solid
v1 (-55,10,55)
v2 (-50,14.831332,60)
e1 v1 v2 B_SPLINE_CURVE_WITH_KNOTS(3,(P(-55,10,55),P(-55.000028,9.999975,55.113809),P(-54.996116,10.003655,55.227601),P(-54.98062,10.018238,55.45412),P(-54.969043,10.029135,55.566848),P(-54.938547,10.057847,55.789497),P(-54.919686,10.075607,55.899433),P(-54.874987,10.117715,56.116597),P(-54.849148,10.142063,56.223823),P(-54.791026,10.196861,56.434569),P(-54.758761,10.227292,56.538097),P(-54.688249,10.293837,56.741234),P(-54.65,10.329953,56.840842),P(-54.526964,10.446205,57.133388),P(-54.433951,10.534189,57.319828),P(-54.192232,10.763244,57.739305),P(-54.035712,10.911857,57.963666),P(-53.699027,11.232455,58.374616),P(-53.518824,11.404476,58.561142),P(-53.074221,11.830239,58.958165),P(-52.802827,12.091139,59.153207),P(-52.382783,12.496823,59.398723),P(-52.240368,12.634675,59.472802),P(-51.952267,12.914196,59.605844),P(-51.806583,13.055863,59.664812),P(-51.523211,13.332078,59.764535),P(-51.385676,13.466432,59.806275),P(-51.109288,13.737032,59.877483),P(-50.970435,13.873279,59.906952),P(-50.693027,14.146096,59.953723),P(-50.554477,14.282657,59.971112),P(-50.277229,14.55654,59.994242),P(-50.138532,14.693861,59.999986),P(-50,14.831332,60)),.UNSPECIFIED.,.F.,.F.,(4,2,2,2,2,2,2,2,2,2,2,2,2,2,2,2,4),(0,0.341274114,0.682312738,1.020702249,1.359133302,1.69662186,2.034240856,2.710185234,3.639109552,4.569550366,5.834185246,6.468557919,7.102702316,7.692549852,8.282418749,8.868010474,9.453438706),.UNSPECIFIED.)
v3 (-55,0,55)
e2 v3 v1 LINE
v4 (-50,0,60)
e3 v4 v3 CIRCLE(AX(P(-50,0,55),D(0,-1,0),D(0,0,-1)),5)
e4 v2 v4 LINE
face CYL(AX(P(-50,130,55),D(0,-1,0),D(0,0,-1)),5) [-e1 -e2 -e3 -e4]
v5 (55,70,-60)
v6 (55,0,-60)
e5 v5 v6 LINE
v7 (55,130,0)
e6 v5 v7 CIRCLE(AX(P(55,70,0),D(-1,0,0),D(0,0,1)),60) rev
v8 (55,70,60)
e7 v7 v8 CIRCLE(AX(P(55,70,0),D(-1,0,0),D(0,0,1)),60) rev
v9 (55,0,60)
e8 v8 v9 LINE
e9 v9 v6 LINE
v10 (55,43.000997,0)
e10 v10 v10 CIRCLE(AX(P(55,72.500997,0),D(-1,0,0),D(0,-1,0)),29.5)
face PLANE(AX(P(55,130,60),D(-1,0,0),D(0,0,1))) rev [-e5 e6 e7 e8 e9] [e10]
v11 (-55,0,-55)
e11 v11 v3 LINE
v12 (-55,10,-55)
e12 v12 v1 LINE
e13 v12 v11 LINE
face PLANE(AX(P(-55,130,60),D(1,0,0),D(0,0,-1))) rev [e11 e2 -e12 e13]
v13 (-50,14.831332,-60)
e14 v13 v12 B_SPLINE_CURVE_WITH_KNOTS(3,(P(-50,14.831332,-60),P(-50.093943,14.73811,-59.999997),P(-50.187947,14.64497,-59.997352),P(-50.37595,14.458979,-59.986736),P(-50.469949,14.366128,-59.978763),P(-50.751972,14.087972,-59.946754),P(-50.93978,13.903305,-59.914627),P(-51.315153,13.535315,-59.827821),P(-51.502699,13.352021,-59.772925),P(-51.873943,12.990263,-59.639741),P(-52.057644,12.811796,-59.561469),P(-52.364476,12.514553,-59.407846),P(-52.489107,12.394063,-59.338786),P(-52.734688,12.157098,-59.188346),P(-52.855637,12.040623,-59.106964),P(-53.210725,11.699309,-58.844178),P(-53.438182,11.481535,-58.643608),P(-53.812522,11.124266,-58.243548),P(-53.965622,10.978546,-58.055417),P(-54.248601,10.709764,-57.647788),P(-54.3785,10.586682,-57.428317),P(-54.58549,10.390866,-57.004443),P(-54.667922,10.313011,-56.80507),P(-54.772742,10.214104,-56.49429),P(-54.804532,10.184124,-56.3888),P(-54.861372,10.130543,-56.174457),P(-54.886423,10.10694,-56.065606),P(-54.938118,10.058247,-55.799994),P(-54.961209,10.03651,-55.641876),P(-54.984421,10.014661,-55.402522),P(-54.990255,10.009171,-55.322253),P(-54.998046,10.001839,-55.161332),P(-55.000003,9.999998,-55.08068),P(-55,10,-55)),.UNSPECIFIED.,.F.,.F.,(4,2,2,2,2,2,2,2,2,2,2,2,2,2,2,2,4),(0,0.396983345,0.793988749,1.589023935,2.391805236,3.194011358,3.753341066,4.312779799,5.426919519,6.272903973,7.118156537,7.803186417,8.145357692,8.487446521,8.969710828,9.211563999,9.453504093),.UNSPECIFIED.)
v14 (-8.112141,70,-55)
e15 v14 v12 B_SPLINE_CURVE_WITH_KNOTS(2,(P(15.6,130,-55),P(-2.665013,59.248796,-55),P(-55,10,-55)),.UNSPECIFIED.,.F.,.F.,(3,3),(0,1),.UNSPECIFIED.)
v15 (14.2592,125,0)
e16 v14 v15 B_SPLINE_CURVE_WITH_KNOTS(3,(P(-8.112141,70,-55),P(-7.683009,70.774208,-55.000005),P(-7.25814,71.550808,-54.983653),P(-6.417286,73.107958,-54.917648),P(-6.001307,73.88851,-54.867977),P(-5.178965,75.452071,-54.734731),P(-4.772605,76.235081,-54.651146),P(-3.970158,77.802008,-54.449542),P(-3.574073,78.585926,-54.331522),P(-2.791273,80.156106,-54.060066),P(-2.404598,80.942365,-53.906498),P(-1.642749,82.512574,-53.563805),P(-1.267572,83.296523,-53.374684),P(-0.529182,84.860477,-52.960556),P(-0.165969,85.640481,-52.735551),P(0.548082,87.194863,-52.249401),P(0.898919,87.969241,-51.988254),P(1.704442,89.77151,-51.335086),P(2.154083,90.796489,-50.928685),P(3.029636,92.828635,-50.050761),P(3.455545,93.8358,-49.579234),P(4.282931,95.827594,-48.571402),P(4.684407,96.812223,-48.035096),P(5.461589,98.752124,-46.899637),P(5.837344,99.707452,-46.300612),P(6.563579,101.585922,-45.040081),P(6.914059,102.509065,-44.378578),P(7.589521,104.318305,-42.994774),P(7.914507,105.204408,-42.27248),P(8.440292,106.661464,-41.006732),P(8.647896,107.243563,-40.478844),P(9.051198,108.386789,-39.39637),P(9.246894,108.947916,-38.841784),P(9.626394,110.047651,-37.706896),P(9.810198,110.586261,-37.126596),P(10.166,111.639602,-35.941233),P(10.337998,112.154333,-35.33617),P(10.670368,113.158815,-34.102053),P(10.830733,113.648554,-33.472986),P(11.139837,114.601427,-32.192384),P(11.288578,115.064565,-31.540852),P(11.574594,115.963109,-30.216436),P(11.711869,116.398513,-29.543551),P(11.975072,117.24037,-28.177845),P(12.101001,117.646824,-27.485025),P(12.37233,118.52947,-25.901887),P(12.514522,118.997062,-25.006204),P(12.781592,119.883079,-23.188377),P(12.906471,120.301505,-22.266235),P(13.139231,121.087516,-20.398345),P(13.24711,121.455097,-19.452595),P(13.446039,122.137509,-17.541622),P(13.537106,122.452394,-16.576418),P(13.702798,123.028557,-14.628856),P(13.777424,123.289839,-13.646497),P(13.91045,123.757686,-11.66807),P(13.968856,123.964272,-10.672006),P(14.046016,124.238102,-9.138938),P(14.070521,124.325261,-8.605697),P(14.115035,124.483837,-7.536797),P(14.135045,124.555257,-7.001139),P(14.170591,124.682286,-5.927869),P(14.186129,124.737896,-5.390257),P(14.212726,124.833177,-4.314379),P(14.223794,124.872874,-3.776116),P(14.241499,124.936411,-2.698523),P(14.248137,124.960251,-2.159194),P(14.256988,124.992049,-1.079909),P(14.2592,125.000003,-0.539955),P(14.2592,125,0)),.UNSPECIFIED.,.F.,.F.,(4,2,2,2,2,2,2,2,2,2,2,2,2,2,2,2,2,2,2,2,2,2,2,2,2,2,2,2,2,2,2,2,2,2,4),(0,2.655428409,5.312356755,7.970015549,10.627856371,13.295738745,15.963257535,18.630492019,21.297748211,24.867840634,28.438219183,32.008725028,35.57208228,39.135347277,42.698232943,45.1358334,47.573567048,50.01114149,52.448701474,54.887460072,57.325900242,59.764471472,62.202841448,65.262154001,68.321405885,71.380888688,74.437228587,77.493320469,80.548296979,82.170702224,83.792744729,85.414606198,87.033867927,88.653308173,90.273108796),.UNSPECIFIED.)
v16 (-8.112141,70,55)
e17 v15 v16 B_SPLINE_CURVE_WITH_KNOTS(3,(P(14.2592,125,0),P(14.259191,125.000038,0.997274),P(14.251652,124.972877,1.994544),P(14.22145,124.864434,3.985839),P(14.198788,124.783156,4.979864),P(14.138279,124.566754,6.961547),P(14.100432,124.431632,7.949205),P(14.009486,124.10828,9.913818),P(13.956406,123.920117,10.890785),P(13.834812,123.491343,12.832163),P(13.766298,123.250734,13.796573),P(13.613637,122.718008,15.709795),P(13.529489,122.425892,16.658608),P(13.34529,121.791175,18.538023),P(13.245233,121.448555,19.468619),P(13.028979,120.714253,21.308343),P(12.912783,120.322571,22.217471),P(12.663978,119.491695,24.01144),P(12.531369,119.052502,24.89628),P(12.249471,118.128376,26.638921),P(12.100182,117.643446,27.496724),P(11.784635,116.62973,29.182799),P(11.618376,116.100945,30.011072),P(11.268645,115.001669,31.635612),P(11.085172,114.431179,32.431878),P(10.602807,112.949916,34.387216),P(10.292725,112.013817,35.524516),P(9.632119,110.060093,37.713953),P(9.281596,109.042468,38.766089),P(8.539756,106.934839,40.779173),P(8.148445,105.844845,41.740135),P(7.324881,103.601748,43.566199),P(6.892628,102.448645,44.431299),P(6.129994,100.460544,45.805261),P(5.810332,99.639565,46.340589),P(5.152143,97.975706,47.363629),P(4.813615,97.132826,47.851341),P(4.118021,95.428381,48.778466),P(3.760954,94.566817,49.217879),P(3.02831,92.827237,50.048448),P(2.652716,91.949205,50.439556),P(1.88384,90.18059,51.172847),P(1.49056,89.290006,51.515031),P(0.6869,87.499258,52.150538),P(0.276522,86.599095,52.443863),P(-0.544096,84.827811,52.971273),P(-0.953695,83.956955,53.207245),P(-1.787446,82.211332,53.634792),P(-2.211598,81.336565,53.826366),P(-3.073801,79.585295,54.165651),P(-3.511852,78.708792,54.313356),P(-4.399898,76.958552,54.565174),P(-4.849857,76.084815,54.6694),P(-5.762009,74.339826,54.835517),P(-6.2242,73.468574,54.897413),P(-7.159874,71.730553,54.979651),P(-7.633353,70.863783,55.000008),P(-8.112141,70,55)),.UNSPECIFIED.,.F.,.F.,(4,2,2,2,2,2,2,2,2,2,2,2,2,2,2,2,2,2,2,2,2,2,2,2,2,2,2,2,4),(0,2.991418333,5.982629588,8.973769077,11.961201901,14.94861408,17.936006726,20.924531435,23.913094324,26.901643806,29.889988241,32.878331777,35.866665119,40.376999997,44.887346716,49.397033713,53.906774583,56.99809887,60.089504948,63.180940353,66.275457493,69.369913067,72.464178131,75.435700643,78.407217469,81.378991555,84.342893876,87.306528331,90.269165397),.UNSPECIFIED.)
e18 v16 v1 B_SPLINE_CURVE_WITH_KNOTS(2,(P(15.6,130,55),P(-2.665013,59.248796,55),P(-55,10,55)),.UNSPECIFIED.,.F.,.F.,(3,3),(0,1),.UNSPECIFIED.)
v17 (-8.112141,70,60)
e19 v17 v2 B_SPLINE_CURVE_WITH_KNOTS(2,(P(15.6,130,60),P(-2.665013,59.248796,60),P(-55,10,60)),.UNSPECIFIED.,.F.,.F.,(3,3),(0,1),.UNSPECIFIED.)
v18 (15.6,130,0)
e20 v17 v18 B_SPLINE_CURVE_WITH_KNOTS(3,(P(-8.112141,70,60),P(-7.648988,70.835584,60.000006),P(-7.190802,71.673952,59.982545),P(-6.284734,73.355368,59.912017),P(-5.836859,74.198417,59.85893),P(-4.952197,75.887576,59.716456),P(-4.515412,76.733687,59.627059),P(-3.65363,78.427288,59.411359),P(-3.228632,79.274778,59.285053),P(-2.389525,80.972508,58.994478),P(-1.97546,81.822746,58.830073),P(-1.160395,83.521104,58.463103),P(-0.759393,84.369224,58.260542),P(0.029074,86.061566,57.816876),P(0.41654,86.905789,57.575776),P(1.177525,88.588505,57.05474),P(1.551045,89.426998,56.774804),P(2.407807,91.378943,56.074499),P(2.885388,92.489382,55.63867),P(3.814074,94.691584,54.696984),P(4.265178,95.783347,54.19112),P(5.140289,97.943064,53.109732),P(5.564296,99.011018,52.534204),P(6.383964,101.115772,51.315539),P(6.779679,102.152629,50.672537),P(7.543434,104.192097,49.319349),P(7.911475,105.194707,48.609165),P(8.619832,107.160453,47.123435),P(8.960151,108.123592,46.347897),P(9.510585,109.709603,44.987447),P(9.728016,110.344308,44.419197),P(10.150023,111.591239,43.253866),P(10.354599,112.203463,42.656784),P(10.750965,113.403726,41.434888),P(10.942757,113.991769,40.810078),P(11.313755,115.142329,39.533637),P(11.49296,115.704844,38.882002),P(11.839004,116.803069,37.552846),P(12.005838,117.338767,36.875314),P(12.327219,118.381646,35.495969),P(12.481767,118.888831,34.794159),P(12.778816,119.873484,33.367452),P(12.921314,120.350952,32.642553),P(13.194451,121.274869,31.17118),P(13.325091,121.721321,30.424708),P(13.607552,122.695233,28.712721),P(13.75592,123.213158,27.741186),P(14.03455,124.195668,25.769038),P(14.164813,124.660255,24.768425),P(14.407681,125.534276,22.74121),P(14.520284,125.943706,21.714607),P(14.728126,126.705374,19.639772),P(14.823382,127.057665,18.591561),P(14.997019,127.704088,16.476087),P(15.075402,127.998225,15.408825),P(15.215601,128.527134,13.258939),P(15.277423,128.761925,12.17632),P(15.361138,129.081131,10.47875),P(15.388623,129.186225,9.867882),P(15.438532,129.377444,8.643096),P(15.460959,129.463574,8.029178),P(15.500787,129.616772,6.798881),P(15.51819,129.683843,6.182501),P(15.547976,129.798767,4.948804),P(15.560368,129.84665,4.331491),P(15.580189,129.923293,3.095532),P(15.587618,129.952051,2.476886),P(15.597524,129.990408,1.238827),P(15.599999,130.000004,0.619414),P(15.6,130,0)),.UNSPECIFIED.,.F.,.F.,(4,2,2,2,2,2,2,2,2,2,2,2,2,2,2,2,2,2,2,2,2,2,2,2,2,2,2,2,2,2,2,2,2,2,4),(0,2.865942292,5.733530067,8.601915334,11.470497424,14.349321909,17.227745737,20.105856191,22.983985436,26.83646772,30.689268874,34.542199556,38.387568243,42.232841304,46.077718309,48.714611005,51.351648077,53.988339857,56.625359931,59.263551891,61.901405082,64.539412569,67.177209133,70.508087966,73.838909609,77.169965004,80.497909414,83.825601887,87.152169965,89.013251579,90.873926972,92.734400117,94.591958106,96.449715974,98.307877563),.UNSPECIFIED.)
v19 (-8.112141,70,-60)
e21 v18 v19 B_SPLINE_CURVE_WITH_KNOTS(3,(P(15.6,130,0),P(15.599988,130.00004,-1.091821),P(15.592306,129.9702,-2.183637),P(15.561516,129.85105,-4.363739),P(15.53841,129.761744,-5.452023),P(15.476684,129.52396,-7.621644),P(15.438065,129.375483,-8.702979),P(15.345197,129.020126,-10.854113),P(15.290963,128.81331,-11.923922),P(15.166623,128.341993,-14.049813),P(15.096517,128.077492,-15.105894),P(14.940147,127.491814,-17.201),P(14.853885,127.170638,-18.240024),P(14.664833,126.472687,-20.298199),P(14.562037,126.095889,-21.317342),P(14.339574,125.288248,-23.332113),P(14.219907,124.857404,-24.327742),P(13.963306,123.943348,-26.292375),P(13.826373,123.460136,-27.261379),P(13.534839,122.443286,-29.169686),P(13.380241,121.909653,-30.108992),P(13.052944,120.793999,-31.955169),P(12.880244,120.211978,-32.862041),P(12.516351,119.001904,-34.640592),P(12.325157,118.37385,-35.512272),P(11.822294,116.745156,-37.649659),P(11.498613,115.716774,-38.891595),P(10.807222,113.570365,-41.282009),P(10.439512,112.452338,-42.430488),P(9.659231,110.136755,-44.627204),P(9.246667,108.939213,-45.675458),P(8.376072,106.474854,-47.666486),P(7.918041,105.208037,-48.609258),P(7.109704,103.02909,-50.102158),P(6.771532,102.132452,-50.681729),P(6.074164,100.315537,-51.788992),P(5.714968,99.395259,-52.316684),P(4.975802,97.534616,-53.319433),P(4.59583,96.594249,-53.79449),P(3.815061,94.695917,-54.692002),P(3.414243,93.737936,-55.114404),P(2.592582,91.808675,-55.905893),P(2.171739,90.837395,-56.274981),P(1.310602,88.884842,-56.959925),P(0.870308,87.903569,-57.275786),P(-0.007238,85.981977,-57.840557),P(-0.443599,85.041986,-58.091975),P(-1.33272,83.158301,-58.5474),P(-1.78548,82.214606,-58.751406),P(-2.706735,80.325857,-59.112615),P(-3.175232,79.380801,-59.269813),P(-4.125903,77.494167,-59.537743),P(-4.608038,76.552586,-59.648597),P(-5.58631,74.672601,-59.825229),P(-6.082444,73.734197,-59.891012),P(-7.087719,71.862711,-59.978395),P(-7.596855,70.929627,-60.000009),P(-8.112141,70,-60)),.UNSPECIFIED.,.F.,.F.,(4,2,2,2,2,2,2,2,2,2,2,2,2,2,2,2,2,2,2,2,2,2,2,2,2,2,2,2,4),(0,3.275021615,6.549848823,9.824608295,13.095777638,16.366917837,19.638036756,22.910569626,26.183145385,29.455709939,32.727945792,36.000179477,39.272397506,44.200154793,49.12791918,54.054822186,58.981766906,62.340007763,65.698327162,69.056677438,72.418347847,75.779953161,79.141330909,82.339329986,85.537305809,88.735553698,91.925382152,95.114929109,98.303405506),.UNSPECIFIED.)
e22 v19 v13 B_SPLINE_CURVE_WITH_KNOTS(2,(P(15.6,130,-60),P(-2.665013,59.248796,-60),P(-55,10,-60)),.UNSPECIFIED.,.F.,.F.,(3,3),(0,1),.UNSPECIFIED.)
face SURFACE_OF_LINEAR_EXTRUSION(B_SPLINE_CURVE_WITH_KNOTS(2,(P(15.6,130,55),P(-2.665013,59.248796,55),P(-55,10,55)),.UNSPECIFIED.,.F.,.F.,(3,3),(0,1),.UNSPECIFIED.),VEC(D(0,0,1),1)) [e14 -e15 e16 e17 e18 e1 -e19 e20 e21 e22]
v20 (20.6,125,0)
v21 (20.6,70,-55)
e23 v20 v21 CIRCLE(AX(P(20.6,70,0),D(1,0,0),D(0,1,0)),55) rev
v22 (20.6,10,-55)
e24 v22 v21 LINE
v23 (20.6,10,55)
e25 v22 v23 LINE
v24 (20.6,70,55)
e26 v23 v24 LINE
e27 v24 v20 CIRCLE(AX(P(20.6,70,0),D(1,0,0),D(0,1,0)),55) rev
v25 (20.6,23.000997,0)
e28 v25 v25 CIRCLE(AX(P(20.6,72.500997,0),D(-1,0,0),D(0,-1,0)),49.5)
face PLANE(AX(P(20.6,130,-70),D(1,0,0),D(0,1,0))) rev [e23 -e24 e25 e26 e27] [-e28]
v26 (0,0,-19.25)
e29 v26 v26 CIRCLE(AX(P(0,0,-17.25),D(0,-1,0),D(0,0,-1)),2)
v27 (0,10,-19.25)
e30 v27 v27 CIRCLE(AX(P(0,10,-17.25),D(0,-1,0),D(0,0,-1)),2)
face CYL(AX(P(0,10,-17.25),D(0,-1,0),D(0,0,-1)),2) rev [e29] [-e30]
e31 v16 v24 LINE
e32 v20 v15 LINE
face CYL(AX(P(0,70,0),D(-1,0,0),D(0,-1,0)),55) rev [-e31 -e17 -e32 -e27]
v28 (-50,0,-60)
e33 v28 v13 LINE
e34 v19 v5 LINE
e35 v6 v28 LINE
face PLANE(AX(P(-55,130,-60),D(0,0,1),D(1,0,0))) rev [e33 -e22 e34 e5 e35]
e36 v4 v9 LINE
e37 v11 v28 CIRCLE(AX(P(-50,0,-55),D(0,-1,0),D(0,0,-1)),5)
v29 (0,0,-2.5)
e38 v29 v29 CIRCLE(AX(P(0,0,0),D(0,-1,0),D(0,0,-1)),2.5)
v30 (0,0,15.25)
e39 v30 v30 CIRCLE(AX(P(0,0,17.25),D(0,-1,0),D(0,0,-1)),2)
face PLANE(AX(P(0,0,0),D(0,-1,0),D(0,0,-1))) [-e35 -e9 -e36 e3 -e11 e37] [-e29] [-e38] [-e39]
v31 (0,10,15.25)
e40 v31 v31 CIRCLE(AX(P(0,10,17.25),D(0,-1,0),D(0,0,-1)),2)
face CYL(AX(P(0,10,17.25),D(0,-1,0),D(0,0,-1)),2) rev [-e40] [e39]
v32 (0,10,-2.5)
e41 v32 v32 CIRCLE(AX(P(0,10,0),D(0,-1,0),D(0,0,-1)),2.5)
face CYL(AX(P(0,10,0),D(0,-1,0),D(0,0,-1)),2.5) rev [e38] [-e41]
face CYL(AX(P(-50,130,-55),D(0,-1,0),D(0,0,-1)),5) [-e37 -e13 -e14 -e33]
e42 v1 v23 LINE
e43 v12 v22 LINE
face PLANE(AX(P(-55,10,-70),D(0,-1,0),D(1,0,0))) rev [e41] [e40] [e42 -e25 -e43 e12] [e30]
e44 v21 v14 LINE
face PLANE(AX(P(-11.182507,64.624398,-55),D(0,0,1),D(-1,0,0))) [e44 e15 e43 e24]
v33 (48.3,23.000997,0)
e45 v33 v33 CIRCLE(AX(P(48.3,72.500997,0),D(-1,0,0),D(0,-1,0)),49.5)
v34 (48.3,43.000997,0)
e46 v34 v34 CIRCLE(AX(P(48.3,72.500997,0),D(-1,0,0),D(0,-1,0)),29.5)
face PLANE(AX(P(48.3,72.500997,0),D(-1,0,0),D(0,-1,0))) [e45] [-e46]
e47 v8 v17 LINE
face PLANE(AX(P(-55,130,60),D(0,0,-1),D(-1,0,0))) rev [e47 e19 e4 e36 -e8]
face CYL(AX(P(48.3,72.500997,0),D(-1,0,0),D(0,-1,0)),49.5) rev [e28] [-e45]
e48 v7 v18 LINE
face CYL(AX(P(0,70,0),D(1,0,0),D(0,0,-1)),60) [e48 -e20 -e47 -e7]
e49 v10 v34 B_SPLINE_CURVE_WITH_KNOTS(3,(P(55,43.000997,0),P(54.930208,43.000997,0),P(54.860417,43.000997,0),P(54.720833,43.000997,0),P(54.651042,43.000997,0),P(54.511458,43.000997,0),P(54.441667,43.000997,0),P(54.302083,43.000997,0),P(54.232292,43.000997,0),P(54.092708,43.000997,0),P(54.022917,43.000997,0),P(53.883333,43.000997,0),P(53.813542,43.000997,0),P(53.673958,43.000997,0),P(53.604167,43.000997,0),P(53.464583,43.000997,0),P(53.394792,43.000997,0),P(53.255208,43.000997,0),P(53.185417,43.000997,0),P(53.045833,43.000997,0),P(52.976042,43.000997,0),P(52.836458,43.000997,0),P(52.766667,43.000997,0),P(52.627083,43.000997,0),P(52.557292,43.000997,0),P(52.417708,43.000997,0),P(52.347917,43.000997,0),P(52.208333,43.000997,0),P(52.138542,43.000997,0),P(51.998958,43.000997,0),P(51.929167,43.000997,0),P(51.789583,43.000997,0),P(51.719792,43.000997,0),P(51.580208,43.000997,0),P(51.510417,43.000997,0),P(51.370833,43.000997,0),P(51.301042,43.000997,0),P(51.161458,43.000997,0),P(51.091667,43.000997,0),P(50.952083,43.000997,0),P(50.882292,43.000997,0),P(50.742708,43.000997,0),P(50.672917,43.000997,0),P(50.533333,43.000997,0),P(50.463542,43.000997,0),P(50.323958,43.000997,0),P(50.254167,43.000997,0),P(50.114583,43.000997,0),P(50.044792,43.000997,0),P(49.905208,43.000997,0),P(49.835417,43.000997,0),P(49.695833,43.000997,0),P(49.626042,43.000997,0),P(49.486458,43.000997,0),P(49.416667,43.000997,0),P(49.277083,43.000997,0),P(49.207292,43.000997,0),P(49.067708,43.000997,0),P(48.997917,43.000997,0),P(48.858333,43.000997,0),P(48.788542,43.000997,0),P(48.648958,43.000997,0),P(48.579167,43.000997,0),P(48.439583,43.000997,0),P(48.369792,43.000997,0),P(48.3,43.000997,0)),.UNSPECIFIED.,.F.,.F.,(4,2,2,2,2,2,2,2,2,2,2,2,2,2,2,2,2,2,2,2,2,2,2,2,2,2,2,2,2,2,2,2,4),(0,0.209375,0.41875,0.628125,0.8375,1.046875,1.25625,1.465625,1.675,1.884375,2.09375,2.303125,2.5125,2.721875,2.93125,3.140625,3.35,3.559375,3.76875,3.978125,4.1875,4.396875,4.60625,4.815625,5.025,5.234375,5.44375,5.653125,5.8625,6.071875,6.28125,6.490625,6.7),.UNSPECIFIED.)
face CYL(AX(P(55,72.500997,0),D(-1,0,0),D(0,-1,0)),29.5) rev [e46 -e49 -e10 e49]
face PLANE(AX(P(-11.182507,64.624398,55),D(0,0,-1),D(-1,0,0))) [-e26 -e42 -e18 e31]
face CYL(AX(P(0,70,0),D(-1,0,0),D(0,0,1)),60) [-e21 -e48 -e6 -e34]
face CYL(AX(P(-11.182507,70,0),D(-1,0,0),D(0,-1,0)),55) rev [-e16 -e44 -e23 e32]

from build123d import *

# Parameters (mm, degrees)
SKETCH_1_W          = 110
SKETCH_1_H          = 120
EXTRUDE_1_DEPTH     = 130
SKETCH_3_W          = 75.6
SKETCH_3_H          = 120
CUT_EXTRUDE_1_DEPTH = 130
EXTRUDE_2_DEPTH     = 5
EXTRUDE_3_DEPTH     = 110
FILLET_START        = -8.112141349
FILLET_2_DEPTH      = 28.712141349
FILLET_START_2      = -55
FILLET_2_2_DEPTH    = 110
FILLET_3_R          = 60
FILLET_4_R          = 5
SKETCH_6_R          = 49.5
CUT_EXTRUDE_2_DEPTH = 27.7
SKETCH_7_R          = 29.5
CUT_EXTRUDE_5_DEPTH = 177.552797006
SKETCH_8_R          = 2.5
SKETCH_8_R_2        = 2
CUT_EXTRUDE_6_DEPTH = 10


with BuildPart() as part:
    # 草图1 → 凸台-拉伸1 (new body)
    with BuildSketch(Plane(origin=(0, 0, 0), x_dir=(1, 0, 0), z_dir=(0, 1, 0))):
        Rectangle(SKETCH_1_W, SKETCH_1_H)
    extrude(amount=EXTRUDE_1_DEPTH)

    # 草图3 → 切除-拉伸1 (cut)
    with BuildSketch(Plane.XY.offset(60)):
        with Locations((-17.2, 70)):
            Rectangle(SKETCH_3_W, SKETCH_3_H)
    extrude(amount=-CUT_EXTRUDE_1_DEPTH, mode=Mode.SUBTRACT)

    # 草图4 → 凸台-拉伸2 (add)
    with BuildSketch(Plane.XY.offset(60)):
        with BuildLine():
            Line((20.6, 130), (15.6, 130))
            add(Edge.make_bspline(
                [(-55, 10), (-2.665013162, 59.248795935), (15.6, 130)],
                knots=[0, 0, 0, 1, 1, 1], degree=2))
            Line((-55, 10), (20.6, 10))
            Line((20.6, 10), (20.6, 130))
        make_face()
    extrude_2 = extrude(amount=-EXTRUDE_2_DEPTH)

    # 镜向1: 凸台-拉伸2 across plane
    add(extrude_2.mirror(Plane.XY))

    # 草图5 → 凸台-拉伸3 (add)
    with BuildSketch(Plane(origin=(0, 0, 55), x_dir=(-1, 0, 0), z_dir=(0, 0, -1))):
        with BuildLine():
            Line((-20.6, 130), (-20.6, 125))
            Line((-20.6, 125), (-14.2592003, 125))
            add(Edge.make_bspline(
                [(-14.259200299, 125), (-14.95110103, 127.486430307), (-15.600000021, 130.000000082)],
                knots=[0.964473117, 0.964473117, 0.964473117, 1, 1, 1], degree=2))
            Line((-15.600000021, 130.000000082), (-20.6, 130))
        make_face()
    extrude(amount=EXTRUDE_3_DEPTH)

    # 圆角2: read off the stored shape, not the designer's step
    # 圆角2 outline → 圆角2 (add)
    with BuildSketch(Plane.YZ.offset(FILLET_START)):
        with BuildLine():
            Line((125, 55), (70, 55))
            ThreePointArc((70, 55), (108.890872965, 38.890872965), (125, 0))
            Line((125, 0), (125, 55))
        make_face()
        with BuildLine():
            Line((125, -55), (125, 0))
            ThreePointArc((125, 0), (108.890872965, -38.890872965), (70, -55))
            Line((70, -55), (125, -55))
        make_face()
    extrude(amount=FILLET_2_DEPTH)

    # Fillet 2 2 outline → Fillet 2 2 (cut)
    with BuildSketch(Plane.XY.offset(FILLET_START_2)):
        with BuildLine():
            add(Edge.make_bspline(
                [(14.259200299, 125), (6.078935587, 95.603213424), (-8.112141272, 69.999999958)],
                knots=[0.035526883, 0.035526883, 0.035526883, 0.455557239, 0.455557239, 0.455557239], degree=2))
            Line((14.259200299, 125), (-8.112141349, 125))
            Line((-8.112141349, 125), (-8.112141272, 69.999999958))
        make_face()
    extrude(amount=FILLET_2_2_DEPTH, mode=Mode.SUBTRACT)

    # 圆角3
    # the kernel refuses this fillet: 60 mm, written as the material it takes off along each edge
    with BuildSketch(Plane(origin=(205, 130, 60), x_dir=(0, -1, 0), z_dir=(-1, 0, 0)), Plane(origin=(205, 130, -60), x_dir=(0, 0, 1), z_dir=(-1, 0, 0))) as fillet_3_piece_1:
        with BuildLine():
            CenterArc((FILLET_3_R, -FILLET_3_R), FILLET_3_R, 90, 90)
            Line((0, -FILLET_3_R), (0, 0))
            Line((0, 0), (FILLET_3_R, 0))
        make_face()
    extrude(amount=339.4, mode=Mode.SUBTRACT)

    # 圆角4
    fillet_4_edges = [part.edges().sort_by_distance(p)[0] for p in [
        (-55, 5, 60),
        (-55, 5, -60),
    ]]
    fillet(fillet_4_edges, radius=FILLET_4_R)

    # 草图6 → 切除-拉伸2 (cut)
    with BuildSketch(Plane.ZY.offset(-20.6)):
        with Locations(Location((0, 72.500997163, 0), (0, 0, 270))):
            Circle(SKETCH_6_R)
    extrude(amount=-CUT_EXTRUDE_2_DEPTH, mode=Mode.SUBTRACT)

    # 草图7 → 切除-拉伸5 (cut, through all)
    with BuildSketch(Plane.ZY.offset(-48.3)):
        with Locations(Location((0, 72.500997163, 0), (0, 0, 270))):
            Circle(SKETCH_7_R)
    extrude(amount=-CUT_EXTRUDE_5_DEPTH, mode=Mode.SUBTRACT)

    # 草图8 → 切除-拉伸6 (cut)
    with BuildSketch(Plane.XZ):
        with Locations(Location((0, 0, 0), (0, 0, 270))):
            Circle(SKETCH_8_R)
        with Locations(Location((0, 17.25, 0), (0, 0, 270))):
            Circle(SKETCH_8_R_2)
        with Locations(Location((0, -17.25, 0), (0, 0, 270))):
            Circle(SKETCH_8_R_2)
    extrude(amount=-CUT_EXTRUDE_6_DEPTH, mode=Mode.SUBTRACT)


solid = part.part
